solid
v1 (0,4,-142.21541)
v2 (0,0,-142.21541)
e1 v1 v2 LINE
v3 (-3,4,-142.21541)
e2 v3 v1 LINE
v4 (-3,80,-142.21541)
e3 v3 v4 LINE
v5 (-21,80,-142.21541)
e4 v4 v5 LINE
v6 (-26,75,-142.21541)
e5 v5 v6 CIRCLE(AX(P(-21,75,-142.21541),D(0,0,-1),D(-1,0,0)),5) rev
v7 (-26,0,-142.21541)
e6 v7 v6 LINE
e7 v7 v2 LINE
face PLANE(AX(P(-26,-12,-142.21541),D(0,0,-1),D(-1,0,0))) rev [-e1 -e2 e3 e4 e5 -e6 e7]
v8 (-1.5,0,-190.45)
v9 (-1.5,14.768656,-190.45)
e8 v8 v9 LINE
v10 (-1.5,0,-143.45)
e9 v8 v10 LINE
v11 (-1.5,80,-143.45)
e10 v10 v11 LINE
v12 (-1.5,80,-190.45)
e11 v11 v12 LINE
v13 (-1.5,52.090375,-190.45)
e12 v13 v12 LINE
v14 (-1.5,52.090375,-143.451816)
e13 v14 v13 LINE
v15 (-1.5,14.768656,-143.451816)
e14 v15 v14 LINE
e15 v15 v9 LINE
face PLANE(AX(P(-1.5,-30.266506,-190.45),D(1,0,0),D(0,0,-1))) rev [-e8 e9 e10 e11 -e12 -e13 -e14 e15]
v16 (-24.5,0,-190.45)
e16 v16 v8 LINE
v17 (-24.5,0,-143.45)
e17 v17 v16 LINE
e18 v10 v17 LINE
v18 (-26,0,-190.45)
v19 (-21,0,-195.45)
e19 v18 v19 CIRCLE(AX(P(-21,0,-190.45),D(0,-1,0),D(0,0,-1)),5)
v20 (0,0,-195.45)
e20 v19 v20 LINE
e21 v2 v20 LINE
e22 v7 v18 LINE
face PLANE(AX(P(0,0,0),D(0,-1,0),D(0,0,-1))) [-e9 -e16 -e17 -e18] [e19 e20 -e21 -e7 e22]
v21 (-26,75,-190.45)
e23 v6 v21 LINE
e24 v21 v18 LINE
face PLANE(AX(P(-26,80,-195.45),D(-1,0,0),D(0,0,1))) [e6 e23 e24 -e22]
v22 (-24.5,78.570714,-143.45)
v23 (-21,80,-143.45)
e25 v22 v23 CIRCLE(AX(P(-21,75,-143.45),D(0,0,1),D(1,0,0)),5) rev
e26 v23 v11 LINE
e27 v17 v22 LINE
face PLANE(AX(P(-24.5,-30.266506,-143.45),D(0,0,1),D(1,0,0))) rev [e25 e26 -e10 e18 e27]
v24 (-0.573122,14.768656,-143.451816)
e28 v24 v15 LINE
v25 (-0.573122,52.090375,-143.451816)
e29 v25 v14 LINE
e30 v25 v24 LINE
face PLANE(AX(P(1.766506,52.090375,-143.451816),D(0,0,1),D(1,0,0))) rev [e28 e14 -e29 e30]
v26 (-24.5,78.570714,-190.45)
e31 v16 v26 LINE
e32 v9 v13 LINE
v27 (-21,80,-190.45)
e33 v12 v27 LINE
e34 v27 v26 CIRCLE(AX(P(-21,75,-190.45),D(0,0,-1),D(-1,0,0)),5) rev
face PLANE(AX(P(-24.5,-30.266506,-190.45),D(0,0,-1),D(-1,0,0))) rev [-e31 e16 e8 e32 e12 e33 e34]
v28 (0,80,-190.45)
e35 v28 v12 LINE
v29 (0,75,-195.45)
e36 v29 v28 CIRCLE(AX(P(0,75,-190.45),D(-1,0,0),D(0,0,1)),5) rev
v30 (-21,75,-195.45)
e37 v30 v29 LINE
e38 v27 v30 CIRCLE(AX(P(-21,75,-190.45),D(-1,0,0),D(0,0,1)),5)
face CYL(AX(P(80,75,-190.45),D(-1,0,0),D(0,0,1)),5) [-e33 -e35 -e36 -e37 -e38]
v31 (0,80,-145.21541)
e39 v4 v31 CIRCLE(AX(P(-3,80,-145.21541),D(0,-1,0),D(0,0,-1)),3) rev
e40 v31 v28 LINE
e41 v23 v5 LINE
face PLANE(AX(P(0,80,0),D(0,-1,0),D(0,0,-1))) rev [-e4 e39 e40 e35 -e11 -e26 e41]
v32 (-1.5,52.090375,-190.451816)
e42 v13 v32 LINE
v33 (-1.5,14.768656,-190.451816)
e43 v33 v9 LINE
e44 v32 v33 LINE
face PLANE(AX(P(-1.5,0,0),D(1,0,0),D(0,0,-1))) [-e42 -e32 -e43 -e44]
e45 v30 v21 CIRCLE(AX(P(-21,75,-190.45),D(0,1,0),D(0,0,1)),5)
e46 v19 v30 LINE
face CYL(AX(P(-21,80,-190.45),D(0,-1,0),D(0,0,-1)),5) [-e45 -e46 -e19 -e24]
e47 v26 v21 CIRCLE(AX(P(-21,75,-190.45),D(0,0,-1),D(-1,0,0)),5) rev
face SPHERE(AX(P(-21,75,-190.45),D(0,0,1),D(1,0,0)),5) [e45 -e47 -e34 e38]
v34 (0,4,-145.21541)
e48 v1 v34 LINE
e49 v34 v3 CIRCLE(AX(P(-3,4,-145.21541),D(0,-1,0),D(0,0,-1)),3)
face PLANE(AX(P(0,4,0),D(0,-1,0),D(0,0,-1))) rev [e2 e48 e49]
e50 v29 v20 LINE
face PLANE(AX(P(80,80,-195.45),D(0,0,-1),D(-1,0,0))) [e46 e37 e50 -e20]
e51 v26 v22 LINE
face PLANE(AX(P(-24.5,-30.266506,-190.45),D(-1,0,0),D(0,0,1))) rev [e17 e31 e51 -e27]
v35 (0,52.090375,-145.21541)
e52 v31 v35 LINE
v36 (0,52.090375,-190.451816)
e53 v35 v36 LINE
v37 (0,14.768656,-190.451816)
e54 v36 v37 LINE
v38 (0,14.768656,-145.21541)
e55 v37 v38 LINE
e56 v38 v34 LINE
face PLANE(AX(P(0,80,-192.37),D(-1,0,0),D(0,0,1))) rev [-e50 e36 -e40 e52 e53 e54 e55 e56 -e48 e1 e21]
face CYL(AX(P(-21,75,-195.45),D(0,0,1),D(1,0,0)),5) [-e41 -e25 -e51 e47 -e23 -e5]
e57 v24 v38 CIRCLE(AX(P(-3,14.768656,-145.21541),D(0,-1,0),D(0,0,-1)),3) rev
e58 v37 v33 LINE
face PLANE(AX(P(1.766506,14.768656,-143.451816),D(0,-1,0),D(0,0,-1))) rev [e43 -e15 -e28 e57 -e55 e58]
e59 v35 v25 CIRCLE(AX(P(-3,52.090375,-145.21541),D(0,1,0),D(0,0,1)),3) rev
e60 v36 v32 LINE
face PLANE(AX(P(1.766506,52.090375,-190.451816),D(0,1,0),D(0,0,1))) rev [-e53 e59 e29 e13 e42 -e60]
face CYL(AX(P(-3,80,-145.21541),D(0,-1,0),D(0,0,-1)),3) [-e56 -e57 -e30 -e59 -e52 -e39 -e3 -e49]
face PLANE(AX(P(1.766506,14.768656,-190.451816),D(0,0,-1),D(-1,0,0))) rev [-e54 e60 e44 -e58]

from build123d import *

# Parameters (mm, degrees)
BOSS_EXTRUDE1_DEPTH = 4
BOSS_EXTRUDE2_DEPTH = 80
SKETCH3_R           = 8.5
CUT_EXTRUDE1_DEPTH  = 171
SKETCH4_W           = 68
SKETCH4_H           = 18.002499925
CUT_EXTRUDE2_DEPTH  = 116
SKETCH5_W           = 23
SKETCH5_H           = 47
CUT_EXTRUDE3_DEPTH  = 110.266506281
SKETCH8_W           = 47
SKETCH8_H           = 37.321718457
CUT_EXTRUDE6_DEPTH  = 3.266506281
FILLET2_R           = 5
FILLET3_R           = 5
FILLET4_R           = 5
SKETCH9_W           = 106
SKETCH9_H           = 50.845410363
CUT_EXTRUDE7_DEPTH  = 92
FILLET16_R          = 10
FILLET18_R          = 3
CUT_EXTRUDE9_DEPTH  = 90


with BuildPart() as part:
    # Sketch1 → Boss-Extrude1 (new body)
    with BuildSketch(Plane(origin=(0, 0, 0), x_dir=(1, 0, 0), z_dir=(0, 1, 0))):
        Polygon((0, 152), (0, 101.37), (75, 101.37), (75, 191.351980657), (75, 192.37), (0, 192.37), align=None)
    extrude(amount=BOSS_EXTRUDE1_DEPTH)

    # Sketch2 → Boss-Extrude2 (add)
    with BuildSketch(Plane(origin=(0, 0, 0), x_dir=(-1, 0, 0), z_dir=(0, -1, 0))):
        Polygon((26, 91.37), (26, 176.99818396), (26, 195.45), (-80, 195.45), (-80, 176.99818396), (-80, 91.37), align=None)
        Polygon((-75, 192), (-75, 192.37), (0, 192.37), (0, 101.37), (-75, 101.37), align=None, mode=Mode.SUBTRACT)
    extrude(amount=-BOSS_EXTRUDE2_DEPTH)

    # Sketch3 → Cut-Extrude1 (cut)
    with BuildSketch(Plane.XY.offset(18)):
        with Locations((34.765402097, 21.5)):
            Circle(SKETCH3_R)
    extrude(amount=-CUT_EXTRUDE1_DEPTH, mode=Mode.SUBTRACT)

    # Sketch4 → Cut-Extrude2 (cut)
    with BuildSketch(Plane(origin=(0, 4, 0), x_dir=(1, 0, 0), z_dir=(0, 1, 0))):
        with Locations((34.5, 183.368750038)):
            Rectangle(SKETCH4_W, SKETCH4_H)
    extrude(amount=-CUT_EXTRUDE2_DEPTH, mode=Mode.SUBTRACT)

    # Sketch5 → Cut-Extrude3 (cut)
    with BuildSketch(Plane(origin=(0, 80, 0), x_dir=(1, 0, 0), z_dir=(0, 1, 0))):
        with Locations((-13, 166.95)):
            Rectangle(SKETCH5_W, SKETCH5_H)
    extrude(amount=-CUT_EXTRUDE3_DEPTH, mode=Mode.SUBTRACT)

    # Sketch8 → Cut-Extrude6 (cut)
    with BuildSketch(Plane.ZY.offset(1.5)):
        with Locations((-166.95181604, 33.429515658)):
            Rectangle(SKETCH8_W, SKETCH8_H)
    extrude(amount=-CUT_EXTRUDE6_DEPTH, mode=Mode.SUBTRACT)

    # Fillet2
    # the kernel refuses this fillet: 5 mm, written as the material it takes off along each edge
    with BuildSketch(Plane(origin=(-21, 75, -190.45), x_dir=(0, 0, -1), z_dir=(0, 1, 0))) as fillet2_piece_1_section:
        Polygon((0, 0), (FILLET2_R, 0), (FILLET2_R, FILLET2_R), (0, FILLET2_R), align=None)
    fillet2_piece_1 = extrude(amount=FILLET2_R, mode=Mode.PRIVATE)
    fillet2_piece_1 = fillet2_piece_1 - Plane(origin=(-21, 75, -190.45), x_dir=(0.7071067811865475, 0, 0.7071067811865475), z_dir=(0, 1, 0)) * Sphere(FILLET2_R, mode=Mode.PRIVATE)
    add(fillet2_piece_1, mode=Mode.SUBTRACT)
    with BuildSketch(Plane(origin=(80, -12.5, -91.37), x_dir=(-1, 0, 0), z_dir=(0, 1, 0))) as fillet2_piece_2:
        with BuildLine():
            CenterArc((FILLET2_R, -FILLET2_R), FILLET2_R, 90, 90)
            Line((0, -FILLET2_R), (0, 0))
            Line((0, 0), (FILLET2_R, 0))
        make_face()
    extrude(amount=105, mode=Mode.SUBTRACT)
    with BuildSketch(Plane(origin=(92.5, 80, -91.37), x_dir=(0, 0, -1), z_dir=(-1, 0, 0))) as fillet2_piece_3:
        with BuildLine():
            CenterArc((FILLET2_R, FILLET2_R), FILLET2_R, 180, 90)
            Line((0, FILLET2_R), (0, 0))
            Line((0, 0), (FILLET2_R, 0))
        make_face()
    extrude(amount=131, mode=Mode.SUBTRACT)
    with BuildSketch(Plane(origin=(-26, -12.5, -195.45), x_dir=(0, 0, 1), z_dir=(0, 1, 0))) as fillet2_piece_4:
        with BuildLine():
            CenterArc((FILLET2_R, FILLET2_R), FILLET2_R, 180, 90)
            Line((0, FILLET2_R), (0, 0))
            Line((0, 0), (FILLET2_R, 0))
        make_face()
    extrude(amount=87.5, mode=Mode.SUBTRACT)
    with BuildSketch(Plane(origin=(-26, 80, -78.87), x_dir=(1, 0, 0), z_dir=(0, 0, -1))) as fillet2_piece_5:
        with BuildLine():
            CenterArc((FILLET2_R, FILLET2_R), FILLET2_R, 180, 90)
            Line((0, FILLET2_R), (0, 0))
            Line((0, 0), (FILLET2_R, 0))
        make_face()
    extrude(amount=111.58, mode=Mode.SUBTRACT)
    with BuildSketch(Plane(origin=(80, -12.5, -195.45), x_dir=(-1, 0, 0), z_dir=(0, 1, 0))) as fillet2_piece_6:
        with BuildLine():
            CenterArc((FILLET2_R, FILLET2_R), FILLET2_R, 180, 90)
            Line((0, FILLET2_R), (0, 0))
            Line((0, 0), (FILLET2_R, 0))
        make_face()
    extrude(amount=105, mode=Mode.SUBTRACT)
    with BuildSketch(Plane(origin=(-21, 80, -195.45), x_dir=(0, 0, 1), z_dir=(1, 0, 0))) as fillet2_piece_7:
        with BuildLine():
            CenterArc((FILLET2_R, FILLET2_R), FILLET2_R, 180, 90)
            Line((0, FILLET2_R), (0, 0))
            Line((0, 0), (FILLET2_R, 0))
        make_face()
    extrude(amount=113.5, mode=Mode.SUBTRACT)

    # Fillet3
    # the kernel refuses this fillet: 5 mm, written as the material it takes off along each edge
    with BuildSketch(Plane(origin=(-21, 75, -96.37), x_dir=(0, 0, 1), z_dir=(-1, 0, 0))) as fillet3_piece_1_section:
        Polygon((0, 0), (FILLET3_R, 0), (FILLET3_R, FILLET3_R), (0, FILLET3_R), align=None)
    fillet3_piece_1 = extrude(amount=FILLET3_R, mode=Mode.PRIVATE)
    fillet3_piece_1 = fillet3_piece_1 - Plane(origin=(-21, 75, -96.37), x_dir=(0, -0.7071067811865475, -0.7071067811865475), z_dir=(-1, 0, 0)) * Sphere(FILLET3_R, mode=Mode.PRIVATE)
    add(fillet3_piece_1, mode=Mode.SUBTRACT)
    with BuildSketch(Plane(origin=(-26, -12.5, -91.37), x_dir=(0, 0, -1), z_dir=(0, 1, 0))) as fillet3_piece_2:
        with BuildLine():
            CenterArc((FILLET3_R, -FILLET3_R), FILLET3_R, 90, 90)
            Line((0, -FILLET3_R), (0, 0))
            Line((0, 0), (FILLET3_R, 0))
        make_face()
    extrude(amount=87.5, mode=Mode.SUBTRACT)

    # Fillet4
    # the kernel refuses this fillet: 5 mm, written as the material it takes off along each edge
    with BuildSketch(Plane(origin=(75, 75, -190.45), x_dir=(1, 0, 0), z_dir=(0, 1, 0))) as fillet4_piece_1_section:
        Polygon((0, 0), (FILLET4_R, 0), (FILLET4_R, FILLET4_R), (0, FILLET4_R), align=None)
    fillet4_piece_1 = extrude(amount=FILLET4_R, mode=Mode.PRIVATE)
    fillet4_piece_1 = fillet4_piece_1 - Plane(origin=(75, 75, -190.45), x_dir=(-0.7071067811865475, 0, 0.7071067811865475), z_dir=(0, 1, 0)) * Sphere(FILLET4_R, mode=Mode.PRIVATE)
    add(fillet4_piece_1, mode=Mode.SUBTRACT)
    with BuildSketch(Plane(origin=(75, 75, -96.37), x_dir=(1, 0, 0), z_dir=(0, 1, 0))) as fillet4_piece_2_section:
        Polygon((0, 0), (FILLET4_R, 0), (FILLET4_R, -FILLET4_R), (0, -FILLET4_R), align=None)
    fillet4_piece_2 = extrude(amount=FILLET4_R, mode=Mode.PRIVATE)
    fillet4_piece_2 = fillet4_piece_2 - Plane(origin=(75, 75, -96.37), x_dir=(-0.7071067811865475, 0, -0.7071067811865475), z_dir=(0, 1, 0)) * Sphere(FILLET4_R, mode=Mode.PRIVATE)
    add(fillet4_piece_2, mode=Mode.SUBTRACT)
    with BuildSketch(Plane(origin=(80, 80, -190.45), x_dir=(-1, 0, 0), z_dir=(0, 0, 1))) as fillet4_piece_3:
        with BuildLine():
            CenterArc((FILLET4_R, FILLET4_R), FILLET4_R, 180, 90)
            Line((0, FILLET4_R), (0, 0))
            Line((0, 0), (FILLET4_R, 0))
        make_face()
    extrude(amount=94.08, mode=Mode.SUBTRACT)

    # Sketch9 → Cut-Extrude7 (cut)
    with BuildSketch(Plane(origin=(0, 80, 0), x_dir=(1, 0, 0), z_dir=(0, 1, 0))):
        with Locations((27, 116.792705182)):
            Rectangle(SKETCH9_W, SKETCH9_H)
    extrude(amount=-CUT_EXTRUDE7_DEPTH, mode=Mode.SUBTRACT)

    # Fillet16
    # the kernel refuses this fillet: 10 mm, written as the material it takes off along each edge
    with BuildSketch(Plane(origin=(75, 101.650635095, -142.215410363), x_dir=(0, 0, -1), z_dir=(0, -1, 0))) as fillet16_piece_1:
        with BuildLine():
            CenterArc((8.660254038, 10), FILLET16_R, 210, 60)
            Line((0, 5), (0, 0))
            Line((0, 0), (8.660254038, 0))
        make_face()
    extrude(amount=97.650635095, mode=Mode.SUBTRACT)

    # Fillet18
    # the kernel refuses this fillet: 3 mm, written as the material it takes off along each edge
    with BuildSketch(Plane(origin=(0, 4, -142.215410363), x_dir=(-1, 0, 0), z_dir=(0, 1, 0))) as fillet18_piece_1:
        with BuildLine():
            CenterArc((FILLET18_R, -FILLET18_R), FILLET18_R, 90, 90)
            Line((0, -FILLET18_R), (0, 0))
            Line((0, 0), (FILLET18_R, 0))
        make_face()
    extrude(amount=83.5, mode=Mode.SUBTRACT)

    # Sketch10 → Cut-Extrude9 (cut)
    with BuildSketch(Plane.XZ):
        Polygon((80, -190.45), (80, -142.215410363), (0, -142.215410363), (0, -195.45), (80, -195.45), align=None)
    extrude(amount=-CUT_EXTRUDE9_DEPTH, mode=Mode.SUBTRACT)


solid = part.part
